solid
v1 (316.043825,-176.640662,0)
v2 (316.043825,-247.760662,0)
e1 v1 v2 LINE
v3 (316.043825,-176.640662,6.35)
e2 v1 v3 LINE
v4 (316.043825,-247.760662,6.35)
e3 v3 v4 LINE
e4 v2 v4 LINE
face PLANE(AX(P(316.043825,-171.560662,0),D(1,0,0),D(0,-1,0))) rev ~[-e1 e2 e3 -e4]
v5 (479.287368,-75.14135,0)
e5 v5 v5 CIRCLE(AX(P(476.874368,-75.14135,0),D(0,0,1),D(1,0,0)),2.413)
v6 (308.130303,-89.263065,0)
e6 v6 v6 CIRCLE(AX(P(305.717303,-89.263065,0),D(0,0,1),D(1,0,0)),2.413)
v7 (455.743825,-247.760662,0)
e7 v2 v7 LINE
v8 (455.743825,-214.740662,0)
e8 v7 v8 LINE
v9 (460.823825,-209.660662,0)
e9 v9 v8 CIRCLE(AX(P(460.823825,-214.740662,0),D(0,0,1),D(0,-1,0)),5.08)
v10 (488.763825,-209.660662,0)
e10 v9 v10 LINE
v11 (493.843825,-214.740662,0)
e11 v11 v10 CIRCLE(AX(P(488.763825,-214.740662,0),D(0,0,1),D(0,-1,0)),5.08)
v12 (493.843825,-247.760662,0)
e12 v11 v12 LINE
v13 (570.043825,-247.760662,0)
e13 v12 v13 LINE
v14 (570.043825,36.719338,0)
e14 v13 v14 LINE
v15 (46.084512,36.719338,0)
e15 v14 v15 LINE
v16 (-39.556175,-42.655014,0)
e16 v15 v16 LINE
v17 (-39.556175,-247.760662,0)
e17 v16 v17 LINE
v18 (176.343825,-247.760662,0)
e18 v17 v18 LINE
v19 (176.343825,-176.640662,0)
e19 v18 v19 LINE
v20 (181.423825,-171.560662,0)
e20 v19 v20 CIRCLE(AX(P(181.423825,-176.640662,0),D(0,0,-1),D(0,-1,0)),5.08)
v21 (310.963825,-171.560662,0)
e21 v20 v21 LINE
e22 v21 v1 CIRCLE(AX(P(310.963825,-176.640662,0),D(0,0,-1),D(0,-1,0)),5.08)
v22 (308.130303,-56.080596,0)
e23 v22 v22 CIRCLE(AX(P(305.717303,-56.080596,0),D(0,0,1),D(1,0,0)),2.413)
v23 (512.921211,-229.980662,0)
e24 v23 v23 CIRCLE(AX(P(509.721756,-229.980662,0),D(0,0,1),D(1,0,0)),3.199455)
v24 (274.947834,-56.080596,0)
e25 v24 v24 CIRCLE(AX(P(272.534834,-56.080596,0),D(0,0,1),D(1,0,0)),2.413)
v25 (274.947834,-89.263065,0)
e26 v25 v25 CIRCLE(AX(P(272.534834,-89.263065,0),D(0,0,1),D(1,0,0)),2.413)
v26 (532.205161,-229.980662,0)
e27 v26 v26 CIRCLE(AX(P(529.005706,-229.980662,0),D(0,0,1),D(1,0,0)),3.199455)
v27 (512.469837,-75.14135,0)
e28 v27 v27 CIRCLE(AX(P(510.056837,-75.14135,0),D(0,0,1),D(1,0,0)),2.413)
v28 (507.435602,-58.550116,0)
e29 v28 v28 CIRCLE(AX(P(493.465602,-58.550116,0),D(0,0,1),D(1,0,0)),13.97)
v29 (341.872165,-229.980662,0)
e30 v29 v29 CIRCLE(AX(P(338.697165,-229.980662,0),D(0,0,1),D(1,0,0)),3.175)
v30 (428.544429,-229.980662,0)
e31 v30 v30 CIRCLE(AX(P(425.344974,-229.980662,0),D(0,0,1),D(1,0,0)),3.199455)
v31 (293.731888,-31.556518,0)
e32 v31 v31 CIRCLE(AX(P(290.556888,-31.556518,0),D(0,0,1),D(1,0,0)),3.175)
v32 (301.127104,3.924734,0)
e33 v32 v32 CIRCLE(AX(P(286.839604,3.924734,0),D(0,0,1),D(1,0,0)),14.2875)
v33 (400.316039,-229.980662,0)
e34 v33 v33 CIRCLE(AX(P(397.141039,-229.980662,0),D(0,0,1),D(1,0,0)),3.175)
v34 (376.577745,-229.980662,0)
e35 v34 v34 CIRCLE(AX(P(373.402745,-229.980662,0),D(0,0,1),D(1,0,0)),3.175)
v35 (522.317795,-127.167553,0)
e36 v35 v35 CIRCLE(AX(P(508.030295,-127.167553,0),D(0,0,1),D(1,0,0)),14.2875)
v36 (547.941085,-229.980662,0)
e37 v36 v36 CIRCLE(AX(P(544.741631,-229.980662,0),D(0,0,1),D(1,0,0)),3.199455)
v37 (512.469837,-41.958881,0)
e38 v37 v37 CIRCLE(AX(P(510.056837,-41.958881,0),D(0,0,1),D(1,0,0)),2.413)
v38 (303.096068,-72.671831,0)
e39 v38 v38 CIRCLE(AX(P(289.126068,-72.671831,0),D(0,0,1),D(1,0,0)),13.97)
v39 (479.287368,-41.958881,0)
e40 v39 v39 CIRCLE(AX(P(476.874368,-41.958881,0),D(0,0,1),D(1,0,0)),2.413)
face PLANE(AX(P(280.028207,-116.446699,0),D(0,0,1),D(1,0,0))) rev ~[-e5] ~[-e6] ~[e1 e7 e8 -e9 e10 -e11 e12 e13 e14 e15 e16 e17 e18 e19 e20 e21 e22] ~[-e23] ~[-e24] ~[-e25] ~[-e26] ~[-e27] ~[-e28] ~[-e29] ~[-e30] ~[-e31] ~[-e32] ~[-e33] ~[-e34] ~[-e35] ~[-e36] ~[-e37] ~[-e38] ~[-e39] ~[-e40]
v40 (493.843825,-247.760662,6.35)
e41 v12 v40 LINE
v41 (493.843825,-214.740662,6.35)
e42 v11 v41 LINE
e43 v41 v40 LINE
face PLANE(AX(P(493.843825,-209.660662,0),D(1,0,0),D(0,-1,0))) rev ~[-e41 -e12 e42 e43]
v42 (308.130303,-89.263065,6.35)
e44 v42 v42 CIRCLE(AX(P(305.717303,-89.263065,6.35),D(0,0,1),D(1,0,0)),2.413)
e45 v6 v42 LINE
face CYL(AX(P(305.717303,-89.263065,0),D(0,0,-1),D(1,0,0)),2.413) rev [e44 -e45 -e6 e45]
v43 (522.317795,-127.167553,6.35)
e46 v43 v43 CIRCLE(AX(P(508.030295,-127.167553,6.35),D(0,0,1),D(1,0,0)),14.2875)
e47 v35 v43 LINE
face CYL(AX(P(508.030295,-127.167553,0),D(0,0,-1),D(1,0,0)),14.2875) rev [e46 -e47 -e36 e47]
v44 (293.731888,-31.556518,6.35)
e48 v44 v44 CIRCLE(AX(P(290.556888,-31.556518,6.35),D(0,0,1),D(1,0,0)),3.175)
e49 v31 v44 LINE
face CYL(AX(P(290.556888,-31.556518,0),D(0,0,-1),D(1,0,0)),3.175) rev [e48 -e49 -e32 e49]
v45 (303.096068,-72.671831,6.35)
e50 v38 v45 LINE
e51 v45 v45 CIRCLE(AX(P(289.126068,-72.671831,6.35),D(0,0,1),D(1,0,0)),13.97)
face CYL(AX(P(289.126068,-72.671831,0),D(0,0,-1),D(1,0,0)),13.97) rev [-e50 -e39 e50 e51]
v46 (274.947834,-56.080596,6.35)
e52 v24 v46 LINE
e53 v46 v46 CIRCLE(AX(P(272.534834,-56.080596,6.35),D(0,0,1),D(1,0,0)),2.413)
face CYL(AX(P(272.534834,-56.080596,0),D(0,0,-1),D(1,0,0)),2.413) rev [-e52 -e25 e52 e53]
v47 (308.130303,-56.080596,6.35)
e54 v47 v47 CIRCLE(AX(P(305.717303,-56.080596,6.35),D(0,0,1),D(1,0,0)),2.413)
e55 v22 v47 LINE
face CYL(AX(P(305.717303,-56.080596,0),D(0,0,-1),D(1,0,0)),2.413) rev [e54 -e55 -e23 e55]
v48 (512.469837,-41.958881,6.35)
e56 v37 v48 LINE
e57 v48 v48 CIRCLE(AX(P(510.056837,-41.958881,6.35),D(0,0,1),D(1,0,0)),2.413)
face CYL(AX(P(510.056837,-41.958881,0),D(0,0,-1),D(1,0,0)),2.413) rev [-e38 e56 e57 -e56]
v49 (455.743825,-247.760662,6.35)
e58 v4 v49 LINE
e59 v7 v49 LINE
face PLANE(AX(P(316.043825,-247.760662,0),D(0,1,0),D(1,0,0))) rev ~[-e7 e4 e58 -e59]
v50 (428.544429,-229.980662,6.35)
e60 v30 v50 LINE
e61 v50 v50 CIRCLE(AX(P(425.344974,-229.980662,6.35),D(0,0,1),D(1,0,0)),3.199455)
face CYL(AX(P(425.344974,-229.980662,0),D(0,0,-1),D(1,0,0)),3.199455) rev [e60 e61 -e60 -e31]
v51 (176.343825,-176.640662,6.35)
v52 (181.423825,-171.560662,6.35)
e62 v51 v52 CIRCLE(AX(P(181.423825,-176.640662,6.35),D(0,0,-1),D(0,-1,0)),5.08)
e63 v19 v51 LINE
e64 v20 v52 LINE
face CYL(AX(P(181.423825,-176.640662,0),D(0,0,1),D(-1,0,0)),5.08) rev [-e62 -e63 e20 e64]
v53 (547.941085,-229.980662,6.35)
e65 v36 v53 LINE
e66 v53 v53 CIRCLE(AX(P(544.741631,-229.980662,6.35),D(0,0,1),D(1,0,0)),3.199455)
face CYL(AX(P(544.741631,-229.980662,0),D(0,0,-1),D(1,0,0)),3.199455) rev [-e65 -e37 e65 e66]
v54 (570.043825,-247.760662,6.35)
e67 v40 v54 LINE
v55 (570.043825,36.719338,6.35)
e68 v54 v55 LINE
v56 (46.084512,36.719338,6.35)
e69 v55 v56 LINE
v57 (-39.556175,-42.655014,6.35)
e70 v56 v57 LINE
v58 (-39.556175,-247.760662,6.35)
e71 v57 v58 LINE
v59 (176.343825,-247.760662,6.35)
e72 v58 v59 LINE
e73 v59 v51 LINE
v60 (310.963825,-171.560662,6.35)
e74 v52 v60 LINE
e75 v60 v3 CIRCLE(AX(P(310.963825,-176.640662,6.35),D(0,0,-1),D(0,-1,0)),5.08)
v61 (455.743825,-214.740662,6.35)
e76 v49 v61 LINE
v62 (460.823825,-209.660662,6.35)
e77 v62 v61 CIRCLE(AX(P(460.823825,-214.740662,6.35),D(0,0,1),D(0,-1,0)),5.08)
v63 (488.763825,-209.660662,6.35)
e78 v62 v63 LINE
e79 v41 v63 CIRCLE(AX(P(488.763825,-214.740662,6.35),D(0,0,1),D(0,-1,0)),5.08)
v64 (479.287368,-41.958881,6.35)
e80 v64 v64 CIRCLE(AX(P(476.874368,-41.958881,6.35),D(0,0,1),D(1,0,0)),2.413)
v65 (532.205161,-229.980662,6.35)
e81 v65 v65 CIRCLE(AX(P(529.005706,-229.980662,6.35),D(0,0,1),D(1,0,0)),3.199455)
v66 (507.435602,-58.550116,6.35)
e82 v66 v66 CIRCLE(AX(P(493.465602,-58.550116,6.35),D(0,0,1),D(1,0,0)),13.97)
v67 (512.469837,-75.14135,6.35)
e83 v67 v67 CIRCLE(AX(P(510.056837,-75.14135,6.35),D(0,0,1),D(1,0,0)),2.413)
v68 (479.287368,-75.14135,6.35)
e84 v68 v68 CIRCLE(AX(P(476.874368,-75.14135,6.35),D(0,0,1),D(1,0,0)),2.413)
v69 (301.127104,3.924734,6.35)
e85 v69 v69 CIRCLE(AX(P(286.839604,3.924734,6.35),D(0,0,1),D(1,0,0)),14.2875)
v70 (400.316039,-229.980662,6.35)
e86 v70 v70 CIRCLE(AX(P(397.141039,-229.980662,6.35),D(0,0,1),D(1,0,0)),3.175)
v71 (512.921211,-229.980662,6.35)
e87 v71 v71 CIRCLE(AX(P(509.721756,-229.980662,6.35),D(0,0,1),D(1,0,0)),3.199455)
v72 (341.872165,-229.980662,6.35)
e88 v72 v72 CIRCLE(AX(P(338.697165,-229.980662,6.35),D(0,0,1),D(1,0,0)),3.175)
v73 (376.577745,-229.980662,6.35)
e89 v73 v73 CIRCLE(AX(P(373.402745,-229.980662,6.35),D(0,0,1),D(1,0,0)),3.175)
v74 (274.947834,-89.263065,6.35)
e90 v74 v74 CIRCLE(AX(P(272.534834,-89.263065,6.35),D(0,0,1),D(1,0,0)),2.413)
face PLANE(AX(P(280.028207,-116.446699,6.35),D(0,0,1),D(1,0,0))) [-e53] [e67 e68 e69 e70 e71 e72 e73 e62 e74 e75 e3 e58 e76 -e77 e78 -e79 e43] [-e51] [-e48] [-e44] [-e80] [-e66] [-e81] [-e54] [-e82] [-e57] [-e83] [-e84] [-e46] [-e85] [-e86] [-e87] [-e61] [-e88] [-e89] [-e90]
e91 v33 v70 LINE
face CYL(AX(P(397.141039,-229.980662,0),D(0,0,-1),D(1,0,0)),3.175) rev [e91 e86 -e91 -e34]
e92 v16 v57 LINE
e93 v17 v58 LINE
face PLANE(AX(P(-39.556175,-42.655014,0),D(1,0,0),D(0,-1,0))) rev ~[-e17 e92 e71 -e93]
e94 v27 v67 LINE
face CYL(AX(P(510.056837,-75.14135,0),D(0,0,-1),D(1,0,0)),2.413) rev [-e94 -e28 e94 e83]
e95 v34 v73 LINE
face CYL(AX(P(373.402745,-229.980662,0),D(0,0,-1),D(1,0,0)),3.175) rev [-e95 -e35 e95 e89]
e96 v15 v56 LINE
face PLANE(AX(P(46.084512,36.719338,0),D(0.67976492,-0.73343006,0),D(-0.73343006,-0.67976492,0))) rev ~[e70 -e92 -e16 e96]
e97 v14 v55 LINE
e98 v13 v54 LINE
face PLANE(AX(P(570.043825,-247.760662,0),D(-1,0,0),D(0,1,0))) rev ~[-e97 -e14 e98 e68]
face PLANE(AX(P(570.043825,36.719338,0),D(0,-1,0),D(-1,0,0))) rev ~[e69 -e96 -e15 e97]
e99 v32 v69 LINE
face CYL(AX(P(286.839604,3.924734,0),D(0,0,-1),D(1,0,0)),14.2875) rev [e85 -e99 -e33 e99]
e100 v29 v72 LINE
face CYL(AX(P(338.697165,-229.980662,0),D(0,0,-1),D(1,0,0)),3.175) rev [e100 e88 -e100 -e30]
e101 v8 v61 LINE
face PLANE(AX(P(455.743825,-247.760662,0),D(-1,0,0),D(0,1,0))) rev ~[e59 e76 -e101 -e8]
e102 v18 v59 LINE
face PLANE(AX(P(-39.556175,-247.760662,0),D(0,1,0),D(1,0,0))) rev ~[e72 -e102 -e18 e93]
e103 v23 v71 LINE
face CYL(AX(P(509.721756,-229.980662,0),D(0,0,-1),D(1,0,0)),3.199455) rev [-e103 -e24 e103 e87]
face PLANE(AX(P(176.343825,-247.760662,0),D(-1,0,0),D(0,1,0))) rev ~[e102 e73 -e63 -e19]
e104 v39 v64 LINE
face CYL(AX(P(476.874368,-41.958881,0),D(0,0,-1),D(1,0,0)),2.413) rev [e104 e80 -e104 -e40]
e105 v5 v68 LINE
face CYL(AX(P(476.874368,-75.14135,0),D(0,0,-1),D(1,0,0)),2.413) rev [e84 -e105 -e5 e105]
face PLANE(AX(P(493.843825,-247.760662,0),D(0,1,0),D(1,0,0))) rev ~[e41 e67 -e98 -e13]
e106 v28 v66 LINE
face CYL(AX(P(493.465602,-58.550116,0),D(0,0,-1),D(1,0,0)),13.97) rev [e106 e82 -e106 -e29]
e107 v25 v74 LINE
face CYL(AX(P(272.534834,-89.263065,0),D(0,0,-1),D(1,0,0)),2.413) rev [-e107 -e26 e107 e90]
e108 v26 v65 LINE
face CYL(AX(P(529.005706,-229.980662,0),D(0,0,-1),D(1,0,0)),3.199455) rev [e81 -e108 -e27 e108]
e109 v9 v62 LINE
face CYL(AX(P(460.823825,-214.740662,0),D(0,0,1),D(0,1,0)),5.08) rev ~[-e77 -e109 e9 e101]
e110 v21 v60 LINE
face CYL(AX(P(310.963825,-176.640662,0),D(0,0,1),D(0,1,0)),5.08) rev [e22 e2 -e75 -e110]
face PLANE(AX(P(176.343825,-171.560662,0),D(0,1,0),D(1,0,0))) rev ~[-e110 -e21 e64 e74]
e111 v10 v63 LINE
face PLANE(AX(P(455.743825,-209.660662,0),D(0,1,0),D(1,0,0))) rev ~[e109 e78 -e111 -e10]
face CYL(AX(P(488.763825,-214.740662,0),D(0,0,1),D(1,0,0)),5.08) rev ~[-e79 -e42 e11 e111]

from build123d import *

# Parameters (mm, degrees)
F0_R     = 3.175
F0_R_2   = 3.1994548284
F0_R_3   = 14.2875
F0_R_4   = 2.413
F0_R_5   = 13.97
F1_DEPTH = 6.35
F2_R     = 5.08


# Not quite as in the source:
# - a length typed as a fraction of an inch, garbled in the dataset ("3 / 203.2 mm" for 3/8 in), is restored


with BuildPart() as f1:
    # F0 (on Top) → F1 (new body)
    with BuildSketch(Plane.XY):
        Polygon((570.0438245296, 36.7193375349), (46.0845124741, 36.7193375349), (-39.5561754704, -42.6550139801), (-39.5561754704, -247.7606624651), (176.3438245296, -247.7606624651), (176.3438245296, -171.5606624651), (316.0438245296, -171.5606624651), (316.0438245296, -247.7606624651), (455.7438245296, -247.7606624651), (455.7438245296, -209.6606624651), (493.8438245296, -209.6606624651), (493.8438245296, -247.7606624651), (570.0438245296, -247.7606624651), align=None)
        with Locations((338.6971652508, -229.9806624651)):
            Circle(F0_R, mode=Mode.SUBTRACT)
        with Locations((373.4027445316, -229.9806624651)):
            Circle(F0_R, mode=Mode.SUBTRACT)
        with Locations((397.1410393715, -229.9806624651)):
            Circle(F0_R, mode=Mode.SUBTRACT)
        with Locations((425.3449738026, -229.9806624651)):
            Circle(F0_R_2, mode=Mode.SUBTRACT)
        with Locations((509.7217559814, -229.9806624651)):
            Circle(F0_R_2, mode=Mode.SUBTRACT)
        with Locations((529.0057063103, -229.9806624651)):
            Circle(F0_R_2, mode=Mode.SUBTRACT)
        with Locations((544.7416305542, -229.9806624651)):
            Circle(F0_R_2, mode=Mode.SUBTRACT)
        with Locations((508.030295372, -127.1675527096)):
            Circle(F0_R_3, mode=Mode.SUBTRACT)
        with Locations((272.5348336594, -89.2630653484)):
            Circle(F0_R_4, mode=Mode.SUBTRACT)
        with Locations((305.7173030479, -89.2630653484)):
            Circle(F0_R_4, mode=Mode.SUBTRACT)
        with Locations((289.1260683537, -72.6718306541)):
            Circle(F0_R_5, mode=Mode.SUBTRACT)
        with Locations((272.5348336594, -56.0805959599)):
            Circle(F0_R_4, mode=Mode.SUBTRACT)
        with Locations((305.7173030479, -56.0805959599)):
            Circle(F0_R_4, mode=Mode.SUBTRACT)
        with Locations((476.8743677037, -75.141350369)):
            Circle(F0_R_4, mode=Mode.SUBTRACT)
        with Locations((510.0568370922, -75.141350369)):
            Circle(F0_R_4, mode=Mode.SUBTRACT)
        with Locations((493.4656023979, -58.5501156747)):
            Circle(F0_R_5, mode=Mode.SUBTRACT)
        with Locations((476.8743677037, -41.9588809805)):
            Circle(F0_R_4, mode=Mode.SUBTRACT)
        with Locations((510.0568370922, -41.9588809805)):
            Circle(F0_R_4, mode=Mode.SUBTRACT)
        with Locations((290.5568880873, -31.5565178133)):
            Circle(F0_R, mode=Mode.SUBTRACT)
        with Locations((286.8396043777, 3.9247339591)):
            Circle(F0_R_3, mode=Mode.SUBTRACT)
    extrude(amount=F1_DEPTH)

    # F2
    f2_edges = [f1.edges().sort_by_distance(p)[0] for p in [
        (176.343825, -171.560662, 3.175),
        (316.043825, -171.560662, 3.175),
        (455.743825, -209.660662, 3.175),
        (493.843825, -209.660662, 3.175),
    ]]
    fillet(f2_edges, radius=F2_R)


solid = f1.part
